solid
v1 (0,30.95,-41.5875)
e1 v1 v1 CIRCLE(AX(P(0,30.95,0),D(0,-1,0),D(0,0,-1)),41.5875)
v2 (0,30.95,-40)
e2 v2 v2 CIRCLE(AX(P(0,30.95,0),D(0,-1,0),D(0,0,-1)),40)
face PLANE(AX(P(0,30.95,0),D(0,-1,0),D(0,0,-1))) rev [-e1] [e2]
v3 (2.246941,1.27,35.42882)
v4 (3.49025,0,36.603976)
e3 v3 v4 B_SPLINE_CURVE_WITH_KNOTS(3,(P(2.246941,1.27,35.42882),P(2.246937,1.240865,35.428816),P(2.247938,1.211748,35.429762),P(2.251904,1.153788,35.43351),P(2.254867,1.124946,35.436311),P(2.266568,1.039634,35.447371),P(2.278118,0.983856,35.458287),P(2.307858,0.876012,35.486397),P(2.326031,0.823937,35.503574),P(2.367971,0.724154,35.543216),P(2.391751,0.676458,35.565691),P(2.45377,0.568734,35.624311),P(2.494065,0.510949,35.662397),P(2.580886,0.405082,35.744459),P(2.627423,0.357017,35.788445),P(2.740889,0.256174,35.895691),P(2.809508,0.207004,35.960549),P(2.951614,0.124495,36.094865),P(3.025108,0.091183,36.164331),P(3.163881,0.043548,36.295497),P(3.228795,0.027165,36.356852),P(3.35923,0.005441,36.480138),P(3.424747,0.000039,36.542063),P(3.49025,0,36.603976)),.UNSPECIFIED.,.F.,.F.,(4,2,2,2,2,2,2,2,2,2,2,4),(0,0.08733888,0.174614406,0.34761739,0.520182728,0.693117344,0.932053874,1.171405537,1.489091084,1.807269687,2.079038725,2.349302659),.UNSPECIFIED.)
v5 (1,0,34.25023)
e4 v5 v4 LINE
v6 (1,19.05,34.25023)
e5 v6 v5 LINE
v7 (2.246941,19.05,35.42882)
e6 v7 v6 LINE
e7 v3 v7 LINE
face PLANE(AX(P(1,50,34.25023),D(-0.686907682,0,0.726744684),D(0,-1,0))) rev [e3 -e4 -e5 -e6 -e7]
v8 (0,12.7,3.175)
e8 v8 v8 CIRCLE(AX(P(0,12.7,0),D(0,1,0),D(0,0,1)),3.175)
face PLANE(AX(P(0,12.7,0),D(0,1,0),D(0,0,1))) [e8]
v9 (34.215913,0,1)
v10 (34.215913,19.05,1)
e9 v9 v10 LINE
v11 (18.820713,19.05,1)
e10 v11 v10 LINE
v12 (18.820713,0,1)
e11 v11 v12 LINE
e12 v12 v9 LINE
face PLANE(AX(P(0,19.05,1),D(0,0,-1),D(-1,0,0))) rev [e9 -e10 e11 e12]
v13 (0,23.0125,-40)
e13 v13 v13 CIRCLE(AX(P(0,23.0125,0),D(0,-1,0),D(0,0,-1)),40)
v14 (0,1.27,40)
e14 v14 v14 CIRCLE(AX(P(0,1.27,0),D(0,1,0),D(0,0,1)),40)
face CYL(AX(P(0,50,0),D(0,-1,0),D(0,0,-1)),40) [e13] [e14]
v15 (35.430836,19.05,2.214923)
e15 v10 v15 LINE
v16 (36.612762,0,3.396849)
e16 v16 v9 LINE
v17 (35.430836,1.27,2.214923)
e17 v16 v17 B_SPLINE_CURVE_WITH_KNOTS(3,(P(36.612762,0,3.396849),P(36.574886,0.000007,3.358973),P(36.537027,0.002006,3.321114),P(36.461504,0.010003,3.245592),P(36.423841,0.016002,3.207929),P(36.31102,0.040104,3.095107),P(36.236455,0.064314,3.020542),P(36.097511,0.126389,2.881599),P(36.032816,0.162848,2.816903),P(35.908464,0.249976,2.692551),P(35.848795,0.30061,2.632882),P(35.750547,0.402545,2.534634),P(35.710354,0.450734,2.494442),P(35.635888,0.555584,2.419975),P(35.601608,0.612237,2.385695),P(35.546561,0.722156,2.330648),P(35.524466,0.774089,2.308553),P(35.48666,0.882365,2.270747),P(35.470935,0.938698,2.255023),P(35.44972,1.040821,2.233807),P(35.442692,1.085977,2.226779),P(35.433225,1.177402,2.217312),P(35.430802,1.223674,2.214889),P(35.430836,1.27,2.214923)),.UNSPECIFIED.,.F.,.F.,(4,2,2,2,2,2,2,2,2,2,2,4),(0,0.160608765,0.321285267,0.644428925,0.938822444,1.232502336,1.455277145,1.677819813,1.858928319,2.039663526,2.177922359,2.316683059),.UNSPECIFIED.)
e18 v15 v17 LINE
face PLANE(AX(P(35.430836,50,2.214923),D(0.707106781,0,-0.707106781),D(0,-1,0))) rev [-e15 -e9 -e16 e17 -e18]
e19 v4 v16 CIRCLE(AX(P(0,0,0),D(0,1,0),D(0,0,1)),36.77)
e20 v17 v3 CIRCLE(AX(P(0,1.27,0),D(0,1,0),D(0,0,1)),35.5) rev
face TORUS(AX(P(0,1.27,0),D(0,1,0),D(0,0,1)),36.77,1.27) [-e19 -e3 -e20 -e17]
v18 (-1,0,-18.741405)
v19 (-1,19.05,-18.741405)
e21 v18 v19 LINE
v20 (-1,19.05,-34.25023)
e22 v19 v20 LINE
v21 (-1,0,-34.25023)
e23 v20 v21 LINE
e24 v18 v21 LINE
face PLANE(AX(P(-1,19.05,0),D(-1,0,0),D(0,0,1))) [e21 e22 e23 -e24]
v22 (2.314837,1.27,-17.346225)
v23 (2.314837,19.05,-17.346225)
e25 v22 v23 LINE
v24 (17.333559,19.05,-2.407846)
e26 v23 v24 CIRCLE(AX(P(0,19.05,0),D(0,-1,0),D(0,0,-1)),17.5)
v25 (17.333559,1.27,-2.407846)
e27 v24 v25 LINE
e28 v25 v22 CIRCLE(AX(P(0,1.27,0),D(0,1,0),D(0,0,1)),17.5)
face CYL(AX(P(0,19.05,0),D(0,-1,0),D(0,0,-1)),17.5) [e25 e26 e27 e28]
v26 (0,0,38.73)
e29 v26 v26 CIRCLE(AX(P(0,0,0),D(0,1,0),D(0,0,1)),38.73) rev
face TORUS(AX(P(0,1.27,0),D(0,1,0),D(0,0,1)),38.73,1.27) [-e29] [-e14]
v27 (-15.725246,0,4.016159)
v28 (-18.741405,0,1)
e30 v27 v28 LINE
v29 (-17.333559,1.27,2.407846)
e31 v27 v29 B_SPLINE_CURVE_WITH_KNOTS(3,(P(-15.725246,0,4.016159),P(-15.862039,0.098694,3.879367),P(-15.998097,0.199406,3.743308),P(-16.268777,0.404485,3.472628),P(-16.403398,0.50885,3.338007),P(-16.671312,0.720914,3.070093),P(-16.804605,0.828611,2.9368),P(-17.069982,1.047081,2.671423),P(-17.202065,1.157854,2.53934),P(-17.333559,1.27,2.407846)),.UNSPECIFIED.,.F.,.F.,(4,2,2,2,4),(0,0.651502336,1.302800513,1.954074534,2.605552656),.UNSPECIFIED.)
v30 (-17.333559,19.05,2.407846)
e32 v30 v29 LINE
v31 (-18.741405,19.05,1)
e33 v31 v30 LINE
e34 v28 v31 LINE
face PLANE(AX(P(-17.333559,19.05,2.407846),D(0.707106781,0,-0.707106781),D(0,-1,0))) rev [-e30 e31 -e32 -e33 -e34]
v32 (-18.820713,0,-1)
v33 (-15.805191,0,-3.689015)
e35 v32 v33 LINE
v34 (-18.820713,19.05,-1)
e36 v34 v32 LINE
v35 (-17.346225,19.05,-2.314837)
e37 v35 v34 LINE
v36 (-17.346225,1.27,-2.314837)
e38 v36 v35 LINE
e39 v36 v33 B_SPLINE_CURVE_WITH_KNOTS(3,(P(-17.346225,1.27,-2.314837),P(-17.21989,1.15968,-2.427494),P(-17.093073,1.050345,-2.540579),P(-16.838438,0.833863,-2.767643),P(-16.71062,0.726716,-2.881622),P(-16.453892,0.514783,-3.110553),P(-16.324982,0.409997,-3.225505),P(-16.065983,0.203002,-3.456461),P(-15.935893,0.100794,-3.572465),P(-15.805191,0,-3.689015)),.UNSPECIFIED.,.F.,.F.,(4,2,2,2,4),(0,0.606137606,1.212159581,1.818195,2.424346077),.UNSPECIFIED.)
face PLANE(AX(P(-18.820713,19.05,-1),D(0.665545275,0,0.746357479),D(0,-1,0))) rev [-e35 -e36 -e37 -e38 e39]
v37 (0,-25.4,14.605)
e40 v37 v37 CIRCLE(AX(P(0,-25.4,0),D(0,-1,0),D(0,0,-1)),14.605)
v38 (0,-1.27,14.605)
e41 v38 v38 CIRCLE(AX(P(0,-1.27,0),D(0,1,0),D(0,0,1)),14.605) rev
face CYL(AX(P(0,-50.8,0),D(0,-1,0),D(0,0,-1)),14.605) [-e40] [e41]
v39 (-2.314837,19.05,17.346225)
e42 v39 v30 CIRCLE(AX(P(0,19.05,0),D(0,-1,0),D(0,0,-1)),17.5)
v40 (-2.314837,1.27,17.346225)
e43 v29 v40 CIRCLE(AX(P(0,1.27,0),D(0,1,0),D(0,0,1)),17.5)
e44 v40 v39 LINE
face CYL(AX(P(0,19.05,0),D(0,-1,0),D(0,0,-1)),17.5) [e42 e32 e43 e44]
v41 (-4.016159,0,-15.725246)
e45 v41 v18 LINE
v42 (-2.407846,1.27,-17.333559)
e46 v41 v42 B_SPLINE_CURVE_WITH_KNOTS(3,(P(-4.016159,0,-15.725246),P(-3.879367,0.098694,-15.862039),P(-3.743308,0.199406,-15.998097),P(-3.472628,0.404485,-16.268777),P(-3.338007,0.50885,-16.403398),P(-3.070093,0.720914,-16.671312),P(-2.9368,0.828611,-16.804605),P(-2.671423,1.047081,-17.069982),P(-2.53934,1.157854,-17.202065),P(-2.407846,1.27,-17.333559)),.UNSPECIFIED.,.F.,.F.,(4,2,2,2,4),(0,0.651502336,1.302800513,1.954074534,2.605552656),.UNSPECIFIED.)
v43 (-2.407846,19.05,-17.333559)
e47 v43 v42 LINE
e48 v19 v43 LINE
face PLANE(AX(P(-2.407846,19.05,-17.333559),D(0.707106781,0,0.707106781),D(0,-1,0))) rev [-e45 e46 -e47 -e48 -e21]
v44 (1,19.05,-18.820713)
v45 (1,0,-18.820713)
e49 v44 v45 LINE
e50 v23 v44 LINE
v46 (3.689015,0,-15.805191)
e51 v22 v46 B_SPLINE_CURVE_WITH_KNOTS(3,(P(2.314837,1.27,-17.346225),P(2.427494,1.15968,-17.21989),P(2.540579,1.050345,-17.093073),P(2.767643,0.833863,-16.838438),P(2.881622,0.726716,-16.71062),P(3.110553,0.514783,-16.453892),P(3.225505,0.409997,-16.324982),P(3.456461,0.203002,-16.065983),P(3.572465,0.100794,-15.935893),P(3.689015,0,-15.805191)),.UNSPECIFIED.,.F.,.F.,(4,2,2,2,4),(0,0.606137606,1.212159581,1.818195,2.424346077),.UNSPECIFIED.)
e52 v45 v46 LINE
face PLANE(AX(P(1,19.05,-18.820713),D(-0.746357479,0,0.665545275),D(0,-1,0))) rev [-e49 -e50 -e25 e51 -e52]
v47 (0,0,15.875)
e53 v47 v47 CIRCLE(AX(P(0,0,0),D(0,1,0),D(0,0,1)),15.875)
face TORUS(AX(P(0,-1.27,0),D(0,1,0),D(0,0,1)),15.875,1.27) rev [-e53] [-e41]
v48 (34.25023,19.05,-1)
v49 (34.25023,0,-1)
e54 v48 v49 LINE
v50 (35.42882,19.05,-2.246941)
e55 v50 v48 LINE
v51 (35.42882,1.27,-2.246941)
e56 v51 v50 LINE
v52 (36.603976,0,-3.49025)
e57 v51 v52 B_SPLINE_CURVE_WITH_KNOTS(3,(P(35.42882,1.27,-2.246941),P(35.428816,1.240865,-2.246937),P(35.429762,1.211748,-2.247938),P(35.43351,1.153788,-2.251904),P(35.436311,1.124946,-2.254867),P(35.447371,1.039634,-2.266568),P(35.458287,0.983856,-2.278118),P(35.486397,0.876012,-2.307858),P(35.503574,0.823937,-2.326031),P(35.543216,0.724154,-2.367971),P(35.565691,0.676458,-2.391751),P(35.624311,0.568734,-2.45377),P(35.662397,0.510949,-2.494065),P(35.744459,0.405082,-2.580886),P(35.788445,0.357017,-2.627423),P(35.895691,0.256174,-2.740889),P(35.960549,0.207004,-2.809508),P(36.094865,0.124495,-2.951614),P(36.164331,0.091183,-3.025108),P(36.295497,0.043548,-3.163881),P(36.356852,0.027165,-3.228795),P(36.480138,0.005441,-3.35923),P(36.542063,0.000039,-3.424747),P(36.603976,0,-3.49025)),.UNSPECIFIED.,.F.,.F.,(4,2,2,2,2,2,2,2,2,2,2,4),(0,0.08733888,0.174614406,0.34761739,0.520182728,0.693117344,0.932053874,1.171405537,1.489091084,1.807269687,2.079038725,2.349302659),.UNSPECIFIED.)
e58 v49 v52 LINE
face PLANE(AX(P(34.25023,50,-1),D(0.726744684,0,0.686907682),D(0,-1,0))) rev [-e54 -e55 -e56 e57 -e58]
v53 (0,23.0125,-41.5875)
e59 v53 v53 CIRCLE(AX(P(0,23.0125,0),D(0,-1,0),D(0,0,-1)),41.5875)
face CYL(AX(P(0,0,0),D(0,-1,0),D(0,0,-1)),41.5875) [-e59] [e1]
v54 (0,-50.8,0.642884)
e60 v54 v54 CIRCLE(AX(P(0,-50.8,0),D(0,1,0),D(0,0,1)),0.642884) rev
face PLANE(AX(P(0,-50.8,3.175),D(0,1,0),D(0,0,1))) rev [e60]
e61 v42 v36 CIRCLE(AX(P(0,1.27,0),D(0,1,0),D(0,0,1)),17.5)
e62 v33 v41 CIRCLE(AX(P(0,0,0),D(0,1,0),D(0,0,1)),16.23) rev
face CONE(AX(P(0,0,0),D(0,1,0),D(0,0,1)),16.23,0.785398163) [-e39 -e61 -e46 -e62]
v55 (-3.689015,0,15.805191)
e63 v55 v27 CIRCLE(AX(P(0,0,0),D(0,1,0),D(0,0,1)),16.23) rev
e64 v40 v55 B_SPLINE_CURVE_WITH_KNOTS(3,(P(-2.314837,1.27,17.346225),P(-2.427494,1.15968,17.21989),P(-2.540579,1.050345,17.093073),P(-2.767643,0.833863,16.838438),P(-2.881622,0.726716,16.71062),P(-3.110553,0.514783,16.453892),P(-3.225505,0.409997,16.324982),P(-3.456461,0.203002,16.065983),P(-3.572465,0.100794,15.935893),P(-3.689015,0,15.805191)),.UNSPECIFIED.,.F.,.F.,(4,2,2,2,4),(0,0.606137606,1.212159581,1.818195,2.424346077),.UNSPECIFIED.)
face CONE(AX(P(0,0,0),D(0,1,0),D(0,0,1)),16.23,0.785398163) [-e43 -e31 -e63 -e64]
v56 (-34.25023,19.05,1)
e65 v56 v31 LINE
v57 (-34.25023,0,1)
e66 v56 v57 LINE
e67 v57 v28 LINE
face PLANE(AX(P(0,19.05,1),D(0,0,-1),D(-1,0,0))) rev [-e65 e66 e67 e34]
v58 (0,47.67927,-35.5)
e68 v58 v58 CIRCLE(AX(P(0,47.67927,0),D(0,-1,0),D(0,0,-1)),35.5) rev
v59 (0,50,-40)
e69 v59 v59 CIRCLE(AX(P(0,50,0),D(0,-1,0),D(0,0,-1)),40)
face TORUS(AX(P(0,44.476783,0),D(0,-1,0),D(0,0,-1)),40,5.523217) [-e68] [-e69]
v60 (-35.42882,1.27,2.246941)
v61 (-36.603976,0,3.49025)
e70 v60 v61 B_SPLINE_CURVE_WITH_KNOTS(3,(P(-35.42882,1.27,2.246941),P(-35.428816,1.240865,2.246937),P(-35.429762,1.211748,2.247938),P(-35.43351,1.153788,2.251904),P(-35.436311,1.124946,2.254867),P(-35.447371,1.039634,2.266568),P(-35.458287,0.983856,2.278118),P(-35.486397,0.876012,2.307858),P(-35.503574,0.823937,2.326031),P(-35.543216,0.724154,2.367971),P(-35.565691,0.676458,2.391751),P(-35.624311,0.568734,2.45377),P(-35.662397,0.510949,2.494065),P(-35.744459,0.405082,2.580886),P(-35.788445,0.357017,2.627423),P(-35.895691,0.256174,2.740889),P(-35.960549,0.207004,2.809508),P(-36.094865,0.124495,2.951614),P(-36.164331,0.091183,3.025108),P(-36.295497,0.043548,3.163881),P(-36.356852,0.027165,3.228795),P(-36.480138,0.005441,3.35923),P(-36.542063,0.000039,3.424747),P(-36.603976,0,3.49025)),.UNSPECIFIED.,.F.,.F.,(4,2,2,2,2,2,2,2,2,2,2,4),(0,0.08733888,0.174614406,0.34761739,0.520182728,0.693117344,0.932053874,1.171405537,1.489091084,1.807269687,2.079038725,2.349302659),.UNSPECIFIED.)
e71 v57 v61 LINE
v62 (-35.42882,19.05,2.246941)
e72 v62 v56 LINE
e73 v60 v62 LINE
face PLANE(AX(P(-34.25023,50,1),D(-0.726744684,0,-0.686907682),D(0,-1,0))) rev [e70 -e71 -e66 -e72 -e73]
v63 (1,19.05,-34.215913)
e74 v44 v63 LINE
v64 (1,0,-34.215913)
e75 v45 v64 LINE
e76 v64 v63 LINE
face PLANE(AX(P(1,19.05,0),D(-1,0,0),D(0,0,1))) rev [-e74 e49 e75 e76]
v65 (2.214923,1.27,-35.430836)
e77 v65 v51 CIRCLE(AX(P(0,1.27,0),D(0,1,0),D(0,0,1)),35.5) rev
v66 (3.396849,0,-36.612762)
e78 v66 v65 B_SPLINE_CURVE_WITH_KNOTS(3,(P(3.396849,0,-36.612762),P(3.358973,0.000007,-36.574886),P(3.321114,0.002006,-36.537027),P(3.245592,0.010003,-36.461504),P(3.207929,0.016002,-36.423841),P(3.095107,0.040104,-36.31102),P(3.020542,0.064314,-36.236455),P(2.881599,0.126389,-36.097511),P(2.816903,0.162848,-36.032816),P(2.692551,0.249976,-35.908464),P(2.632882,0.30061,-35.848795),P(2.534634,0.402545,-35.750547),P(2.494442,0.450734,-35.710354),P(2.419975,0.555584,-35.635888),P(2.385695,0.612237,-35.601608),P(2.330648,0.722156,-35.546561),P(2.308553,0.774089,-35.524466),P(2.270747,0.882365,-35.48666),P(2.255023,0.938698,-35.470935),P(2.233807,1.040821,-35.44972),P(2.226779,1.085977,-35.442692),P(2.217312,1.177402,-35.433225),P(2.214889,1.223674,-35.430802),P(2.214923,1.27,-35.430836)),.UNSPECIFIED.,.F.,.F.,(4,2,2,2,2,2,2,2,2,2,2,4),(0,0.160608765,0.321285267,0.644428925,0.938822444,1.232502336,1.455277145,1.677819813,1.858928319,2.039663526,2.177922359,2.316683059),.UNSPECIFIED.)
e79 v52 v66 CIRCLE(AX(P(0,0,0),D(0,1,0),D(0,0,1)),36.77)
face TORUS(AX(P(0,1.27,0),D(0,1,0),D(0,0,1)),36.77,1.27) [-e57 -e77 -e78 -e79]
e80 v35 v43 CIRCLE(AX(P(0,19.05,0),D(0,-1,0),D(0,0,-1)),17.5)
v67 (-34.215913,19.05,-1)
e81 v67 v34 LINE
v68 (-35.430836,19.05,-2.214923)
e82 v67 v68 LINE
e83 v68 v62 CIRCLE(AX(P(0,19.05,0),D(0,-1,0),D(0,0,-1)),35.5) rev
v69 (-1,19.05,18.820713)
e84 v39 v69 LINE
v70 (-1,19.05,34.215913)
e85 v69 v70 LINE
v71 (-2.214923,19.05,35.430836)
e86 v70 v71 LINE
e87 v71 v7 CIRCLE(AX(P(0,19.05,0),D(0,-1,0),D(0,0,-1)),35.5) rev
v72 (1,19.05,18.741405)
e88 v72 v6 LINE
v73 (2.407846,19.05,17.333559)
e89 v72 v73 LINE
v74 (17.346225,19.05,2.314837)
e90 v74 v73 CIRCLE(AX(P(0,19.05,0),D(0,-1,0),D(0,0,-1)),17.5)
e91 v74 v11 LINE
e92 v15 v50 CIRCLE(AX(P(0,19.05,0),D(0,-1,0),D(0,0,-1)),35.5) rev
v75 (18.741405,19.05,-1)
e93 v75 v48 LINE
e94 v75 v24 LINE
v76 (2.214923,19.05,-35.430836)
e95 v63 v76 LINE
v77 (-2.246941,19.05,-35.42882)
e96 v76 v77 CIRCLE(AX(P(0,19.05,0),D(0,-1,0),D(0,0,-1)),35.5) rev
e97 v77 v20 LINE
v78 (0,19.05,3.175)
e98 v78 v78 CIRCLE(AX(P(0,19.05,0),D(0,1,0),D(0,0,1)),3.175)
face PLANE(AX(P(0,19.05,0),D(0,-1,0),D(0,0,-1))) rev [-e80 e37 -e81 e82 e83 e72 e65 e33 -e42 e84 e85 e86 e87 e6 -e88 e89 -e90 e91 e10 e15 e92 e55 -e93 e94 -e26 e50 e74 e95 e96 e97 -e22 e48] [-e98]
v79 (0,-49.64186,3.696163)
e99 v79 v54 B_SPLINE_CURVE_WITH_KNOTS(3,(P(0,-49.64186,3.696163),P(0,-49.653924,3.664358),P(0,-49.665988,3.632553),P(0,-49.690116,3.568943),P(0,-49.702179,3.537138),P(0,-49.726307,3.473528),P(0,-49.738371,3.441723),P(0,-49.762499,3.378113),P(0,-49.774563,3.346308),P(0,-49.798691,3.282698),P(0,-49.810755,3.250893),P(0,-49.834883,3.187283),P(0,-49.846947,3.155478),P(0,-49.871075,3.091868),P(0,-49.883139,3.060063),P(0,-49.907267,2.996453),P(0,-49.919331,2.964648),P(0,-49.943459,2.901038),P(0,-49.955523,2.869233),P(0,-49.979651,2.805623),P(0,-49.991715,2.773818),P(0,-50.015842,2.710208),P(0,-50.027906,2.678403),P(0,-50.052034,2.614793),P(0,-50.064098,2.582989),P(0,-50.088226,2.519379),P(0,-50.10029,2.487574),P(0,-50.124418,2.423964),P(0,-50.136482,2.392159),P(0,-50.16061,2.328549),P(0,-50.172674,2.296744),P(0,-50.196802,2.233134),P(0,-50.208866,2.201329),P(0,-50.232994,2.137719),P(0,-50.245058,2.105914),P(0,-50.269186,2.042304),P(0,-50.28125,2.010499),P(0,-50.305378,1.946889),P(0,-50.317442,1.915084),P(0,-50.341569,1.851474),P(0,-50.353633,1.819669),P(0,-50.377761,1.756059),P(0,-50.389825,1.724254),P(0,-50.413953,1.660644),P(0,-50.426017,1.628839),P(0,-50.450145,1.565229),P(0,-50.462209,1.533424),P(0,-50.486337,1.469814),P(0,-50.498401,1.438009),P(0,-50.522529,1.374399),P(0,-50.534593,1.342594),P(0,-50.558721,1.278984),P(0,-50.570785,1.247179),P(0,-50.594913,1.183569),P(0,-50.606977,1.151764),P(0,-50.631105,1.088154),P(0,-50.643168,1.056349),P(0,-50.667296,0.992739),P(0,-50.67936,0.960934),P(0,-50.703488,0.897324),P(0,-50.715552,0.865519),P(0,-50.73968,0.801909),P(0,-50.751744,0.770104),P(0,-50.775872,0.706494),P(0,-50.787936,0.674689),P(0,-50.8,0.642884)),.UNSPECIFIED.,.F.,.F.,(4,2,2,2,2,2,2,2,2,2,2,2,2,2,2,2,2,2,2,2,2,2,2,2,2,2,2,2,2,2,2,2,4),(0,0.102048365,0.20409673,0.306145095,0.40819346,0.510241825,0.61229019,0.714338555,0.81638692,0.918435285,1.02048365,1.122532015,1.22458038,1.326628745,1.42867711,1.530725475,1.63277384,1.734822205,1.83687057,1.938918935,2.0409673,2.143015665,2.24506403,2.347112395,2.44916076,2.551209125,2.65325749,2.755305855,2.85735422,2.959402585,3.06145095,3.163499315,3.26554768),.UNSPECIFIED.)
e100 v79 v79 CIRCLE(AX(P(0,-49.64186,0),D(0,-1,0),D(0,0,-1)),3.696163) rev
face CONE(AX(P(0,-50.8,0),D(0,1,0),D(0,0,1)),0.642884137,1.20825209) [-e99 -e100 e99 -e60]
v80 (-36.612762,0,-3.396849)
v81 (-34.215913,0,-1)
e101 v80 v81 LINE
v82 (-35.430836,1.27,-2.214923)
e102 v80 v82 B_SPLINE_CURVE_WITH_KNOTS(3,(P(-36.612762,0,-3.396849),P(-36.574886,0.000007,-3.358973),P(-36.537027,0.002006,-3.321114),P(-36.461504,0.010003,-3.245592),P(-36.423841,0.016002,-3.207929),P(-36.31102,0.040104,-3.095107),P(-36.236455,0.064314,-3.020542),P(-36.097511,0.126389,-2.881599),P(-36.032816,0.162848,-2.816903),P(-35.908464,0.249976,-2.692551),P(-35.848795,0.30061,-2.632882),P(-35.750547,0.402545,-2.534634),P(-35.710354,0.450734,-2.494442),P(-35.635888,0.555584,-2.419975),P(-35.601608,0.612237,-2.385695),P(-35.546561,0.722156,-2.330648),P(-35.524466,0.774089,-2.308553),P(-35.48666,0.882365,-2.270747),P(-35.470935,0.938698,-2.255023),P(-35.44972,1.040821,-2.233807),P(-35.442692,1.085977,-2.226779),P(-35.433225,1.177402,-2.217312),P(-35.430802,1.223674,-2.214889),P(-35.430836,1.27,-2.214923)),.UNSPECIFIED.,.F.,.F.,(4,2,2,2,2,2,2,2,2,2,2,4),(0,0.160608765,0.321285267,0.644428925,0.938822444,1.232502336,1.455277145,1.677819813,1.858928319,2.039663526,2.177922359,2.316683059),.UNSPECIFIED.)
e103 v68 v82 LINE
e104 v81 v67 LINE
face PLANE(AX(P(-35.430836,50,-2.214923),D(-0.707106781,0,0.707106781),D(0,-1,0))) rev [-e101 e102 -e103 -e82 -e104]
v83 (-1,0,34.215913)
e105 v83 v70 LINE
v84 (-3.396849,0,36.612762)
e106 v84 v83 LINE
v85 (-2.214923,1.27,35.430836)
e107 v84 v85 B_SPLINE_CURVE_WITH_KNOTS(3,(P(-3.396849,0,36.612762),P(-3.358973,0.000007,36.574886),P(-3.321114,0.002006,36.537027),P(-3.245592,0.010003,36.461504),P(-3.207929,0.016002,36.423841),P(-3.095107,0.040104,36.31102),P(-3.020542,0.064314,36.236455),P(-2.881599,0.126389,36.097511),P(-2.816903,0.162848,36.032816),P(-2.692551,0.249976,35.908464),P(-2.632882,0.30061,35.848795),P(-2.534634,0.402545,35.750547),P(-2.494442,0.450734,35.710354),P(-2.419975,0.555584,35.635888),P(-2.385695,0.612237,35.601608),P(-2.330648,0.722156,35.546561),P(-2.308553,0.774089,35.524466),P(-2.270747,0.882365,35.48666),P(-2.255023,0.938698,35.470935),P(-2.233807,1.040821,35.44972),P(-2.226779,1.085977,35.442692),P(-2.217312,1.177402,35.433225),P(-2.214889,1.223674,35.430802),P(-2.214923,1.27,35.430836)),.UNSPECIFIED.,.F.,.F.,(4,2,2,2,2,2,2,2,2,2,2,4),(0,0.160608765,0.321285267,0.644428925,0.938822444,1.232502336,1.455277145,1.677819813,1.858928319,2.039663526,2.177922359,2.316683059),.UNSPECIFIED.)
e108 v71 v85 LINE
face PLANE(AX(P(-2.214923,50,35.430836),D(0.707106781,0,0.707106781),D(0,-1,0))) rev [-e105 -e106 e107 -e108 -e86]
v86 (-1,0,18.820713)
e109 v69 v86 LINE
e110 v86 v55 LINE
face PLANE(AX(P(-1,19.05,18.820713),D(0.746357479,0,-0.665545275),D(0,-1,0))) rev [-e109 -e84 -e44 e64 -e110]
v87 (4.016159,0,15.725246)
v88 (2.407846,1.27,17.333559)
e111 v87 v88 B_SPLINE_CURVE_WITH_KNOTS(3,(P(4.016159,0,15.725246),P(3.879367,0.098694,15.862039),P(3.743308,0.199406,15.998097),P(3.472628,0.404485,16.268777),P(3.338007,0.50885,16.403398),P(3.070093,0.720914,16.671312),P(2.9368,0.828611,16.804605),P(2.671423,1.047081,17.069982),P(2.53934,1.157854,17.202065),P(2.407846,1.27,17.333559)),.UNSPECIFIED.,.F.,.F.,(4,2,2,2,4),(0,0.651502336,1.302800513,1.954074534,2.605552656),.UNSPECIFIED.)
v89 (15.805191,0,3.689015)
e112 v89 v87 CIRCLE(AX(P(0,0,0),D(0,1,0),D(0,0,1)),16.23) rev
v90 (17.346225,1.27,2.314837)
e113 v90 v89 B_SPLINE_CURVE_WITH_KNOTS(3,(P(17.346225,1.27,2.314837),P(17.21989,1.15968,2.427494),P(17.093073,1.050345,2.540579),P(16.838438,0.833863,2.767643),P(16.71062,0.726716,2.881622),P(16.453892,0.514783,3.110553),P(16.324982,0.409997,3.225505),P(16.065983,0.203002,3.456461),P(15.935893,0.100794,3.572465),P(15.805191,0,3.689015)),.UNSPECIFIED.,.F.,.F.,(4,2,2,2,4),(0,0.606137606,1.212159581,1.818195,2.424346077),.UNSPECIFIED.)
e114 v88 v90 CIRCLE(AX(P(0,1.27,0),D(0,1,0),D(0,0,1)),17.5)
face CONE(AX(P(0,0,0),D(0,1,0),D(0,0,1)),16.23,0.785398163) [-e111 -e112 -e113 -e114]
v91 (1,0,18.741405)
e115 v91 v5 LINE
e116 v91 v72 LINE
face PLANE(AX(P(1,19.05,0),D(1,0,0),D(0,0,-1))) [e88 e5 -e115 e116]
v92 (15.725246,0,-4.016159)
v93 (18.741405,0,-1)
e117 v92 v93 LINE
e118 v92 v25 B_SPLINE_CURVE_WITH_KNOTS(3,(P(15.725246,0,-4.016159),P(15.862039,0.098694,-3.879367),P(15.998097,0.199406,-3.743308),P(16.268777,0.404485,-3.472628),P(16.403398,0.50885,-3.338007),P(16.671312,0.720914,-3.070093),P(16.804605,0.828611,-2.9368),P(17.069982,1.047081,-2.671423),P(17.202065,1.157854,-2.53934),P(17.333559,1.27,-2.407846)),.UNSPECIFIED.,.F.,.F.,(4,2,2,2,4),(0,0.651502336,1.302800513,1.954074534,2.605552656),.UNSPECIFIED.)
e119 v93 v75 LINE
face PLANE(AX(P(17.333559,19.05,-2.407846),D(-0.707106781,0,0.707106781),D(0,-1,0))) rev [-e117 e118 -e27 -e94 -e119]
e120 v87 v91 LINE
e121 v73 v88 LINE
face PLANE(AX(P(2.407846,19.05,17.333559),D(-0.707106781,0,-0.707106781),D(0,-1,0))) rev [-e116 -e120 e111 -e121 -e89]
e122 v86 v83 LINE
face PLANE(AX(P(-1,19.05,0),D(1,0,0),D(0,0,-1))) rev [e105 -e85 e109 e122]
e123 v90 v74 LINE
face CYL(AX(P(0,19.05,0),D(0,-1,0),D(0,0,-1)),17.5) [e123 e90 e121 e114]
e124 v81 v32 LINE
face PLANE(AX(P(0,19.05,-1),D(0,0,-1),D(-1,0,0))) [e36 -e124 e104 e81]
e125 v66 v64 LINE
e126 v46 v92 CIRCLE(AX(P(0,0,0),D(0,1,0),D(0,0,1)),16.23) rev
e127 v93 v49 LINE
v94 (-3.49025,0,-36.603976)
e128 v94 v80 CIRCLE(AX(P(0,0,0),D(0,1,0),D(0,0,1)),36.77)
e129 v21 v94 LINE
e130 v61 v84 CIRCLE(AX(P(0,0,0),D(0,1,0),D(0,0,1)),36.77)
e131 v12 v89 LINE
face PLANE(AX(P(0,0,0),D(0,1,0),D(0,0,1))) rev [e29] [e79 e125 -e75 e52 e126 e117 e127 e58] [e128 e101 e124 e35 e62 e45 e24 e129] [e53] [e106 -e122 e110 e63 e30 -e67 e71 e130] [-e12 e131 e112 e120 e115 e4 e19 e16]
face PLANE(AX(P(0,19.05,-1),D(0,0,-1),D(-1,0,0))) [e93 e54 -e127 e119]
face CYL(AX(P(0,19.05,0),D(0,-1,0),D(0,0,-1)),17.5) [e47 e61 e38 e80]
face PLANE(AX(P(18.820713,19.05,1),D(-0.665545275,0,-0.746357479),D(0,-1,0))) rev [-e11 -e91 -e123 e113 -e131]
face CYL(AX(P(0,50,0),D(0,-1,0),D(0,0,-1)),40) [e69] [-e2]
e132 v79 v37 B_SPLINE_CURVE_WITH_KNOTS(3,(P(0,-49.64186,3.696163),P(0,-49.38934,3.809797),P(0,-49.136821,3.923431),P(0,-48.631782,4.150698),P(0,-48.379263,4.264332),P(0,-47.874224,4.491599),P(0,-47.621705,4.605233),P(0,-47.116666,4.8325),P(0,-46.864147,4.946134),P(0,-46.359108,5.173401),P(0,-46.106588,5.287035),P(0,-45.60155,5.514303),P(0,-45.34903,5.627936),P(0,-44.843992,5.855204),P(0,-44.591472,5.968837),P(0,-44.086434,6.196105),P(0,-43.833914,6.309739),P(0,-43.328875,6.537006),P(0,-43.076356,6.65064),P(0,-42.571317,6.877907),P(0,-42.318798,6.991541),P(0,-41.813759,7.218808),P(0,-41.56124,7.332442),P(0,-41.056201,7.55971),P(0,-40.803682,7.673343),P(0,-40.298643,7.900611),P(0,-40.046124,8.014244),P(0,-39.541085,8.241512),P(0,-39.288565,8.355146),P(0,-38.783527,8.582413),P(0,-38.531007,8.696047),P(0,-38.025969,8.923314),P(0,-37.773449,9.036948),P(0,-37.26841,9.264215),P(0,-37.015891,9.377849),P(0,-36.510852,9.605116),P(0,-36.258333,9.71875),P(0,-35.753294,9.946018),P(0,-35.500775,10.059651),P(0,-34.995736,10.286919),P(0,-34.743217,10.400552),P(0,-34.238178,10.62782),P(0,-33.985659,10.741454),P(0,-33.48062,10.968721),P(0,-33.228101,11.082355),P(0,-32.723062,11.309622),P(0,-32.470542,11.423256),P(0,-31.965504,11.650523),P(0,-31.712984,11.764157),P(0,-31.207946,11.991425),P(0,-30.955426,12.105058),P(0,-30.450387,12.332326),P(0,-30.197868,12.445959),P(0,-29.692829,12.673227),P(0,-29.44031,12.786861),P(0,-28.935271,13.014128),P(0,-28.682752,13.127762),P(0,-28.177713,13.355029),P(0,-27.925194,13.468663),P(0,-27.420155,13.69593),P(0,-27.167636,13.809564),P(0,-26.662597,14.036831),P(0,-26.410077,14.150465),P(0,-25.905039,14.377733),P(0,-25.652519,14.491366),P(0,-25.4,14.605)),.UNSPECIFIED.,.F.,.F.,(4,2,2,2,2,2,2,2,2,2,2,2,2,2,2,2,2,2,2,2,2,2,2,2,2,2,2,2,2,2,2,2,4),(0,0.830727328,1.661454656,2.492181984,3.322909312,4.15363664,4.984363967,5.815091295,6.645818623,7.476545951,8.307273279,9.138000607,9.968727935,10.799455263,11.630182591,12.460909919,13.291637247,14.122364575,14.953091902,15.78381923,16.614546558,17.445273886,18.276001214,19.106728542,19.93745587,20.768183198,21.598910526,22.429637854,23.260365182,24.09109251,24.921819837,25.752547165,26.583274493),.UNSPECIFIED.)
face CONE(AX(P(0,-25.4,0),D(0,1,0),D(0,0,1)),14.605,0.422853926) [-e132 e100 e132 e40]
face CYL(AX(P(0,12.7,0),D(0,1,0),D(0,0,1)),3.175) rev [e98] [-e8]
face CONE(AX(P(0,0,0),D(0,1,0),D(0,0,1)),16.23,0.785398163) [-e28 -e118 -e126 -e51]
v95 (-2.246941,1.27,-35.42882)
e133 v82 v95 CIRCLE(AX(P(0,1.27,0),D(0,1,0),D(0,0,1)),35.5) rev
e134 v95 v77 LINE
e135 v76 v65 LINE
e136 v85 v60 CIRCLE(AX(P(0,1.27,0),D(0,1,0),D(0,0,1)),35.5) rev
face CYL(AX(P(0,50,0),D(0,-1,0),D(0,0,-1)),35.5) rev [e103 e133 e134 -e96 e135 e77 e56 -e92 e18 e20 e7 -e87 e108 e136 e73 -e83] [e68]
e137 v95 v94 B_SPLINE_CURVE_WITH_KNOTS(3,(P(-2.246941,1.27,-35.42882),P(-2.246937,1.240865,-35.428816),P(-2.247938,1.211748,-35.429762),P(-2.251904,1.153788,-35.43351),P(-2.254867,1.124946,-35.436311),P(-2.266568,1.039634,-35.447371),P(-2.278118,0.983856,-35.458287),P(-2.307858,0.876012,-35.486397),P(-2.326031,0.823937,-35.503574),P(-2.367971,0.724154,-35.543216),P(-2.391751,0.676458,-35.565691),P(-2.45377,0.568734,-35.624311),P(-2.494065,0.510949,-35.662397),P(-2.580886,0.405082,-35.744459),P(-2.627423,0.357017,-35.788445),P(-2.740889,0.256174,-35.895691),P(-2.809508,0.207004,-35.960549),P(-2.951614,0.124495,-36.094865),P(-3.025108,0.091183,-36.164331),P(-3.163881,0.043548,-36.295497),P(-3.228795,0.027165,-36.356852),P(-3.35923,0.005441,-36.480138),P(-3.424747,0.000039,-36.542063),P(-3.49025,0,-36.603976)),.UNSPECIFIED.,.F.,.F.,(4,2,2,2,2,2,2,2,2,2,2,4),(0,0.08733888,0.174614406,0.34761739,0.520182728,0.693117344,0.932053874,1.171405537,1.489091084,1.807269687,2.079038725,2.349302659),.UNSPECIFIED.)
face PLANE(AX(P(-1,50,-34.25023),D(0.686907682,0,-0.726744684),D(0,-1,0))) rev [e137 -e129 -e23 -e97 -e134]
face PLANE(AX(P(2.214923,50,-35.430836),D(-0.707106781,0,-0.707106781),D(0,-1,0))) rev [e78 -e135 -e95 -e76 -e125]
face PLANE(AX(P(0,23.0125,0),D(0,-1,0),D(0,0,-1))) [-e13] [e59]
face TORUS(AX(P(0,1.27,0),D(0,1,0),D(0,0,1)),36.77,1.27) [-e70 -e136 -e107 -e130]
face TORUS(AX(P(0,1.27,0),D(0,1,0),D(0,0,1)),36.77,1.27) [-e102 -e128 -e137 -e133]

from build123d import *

# Parameters (mm, degrees)
SKETCH1_R           = 40
SKETCH1_R_2         = 35.5
BOSS_EXTRUDE1_DEPTH = 50
BOSS_EXTRUDE2_DEPTH = 19.05
SKETCH4_R           = 3.175
CUT_EXTRUDE1_DEPTH  = 6.35
CHAMFER1_SIZE       = 1.27
CHAMFER1_SIZE2      = 2.532115863
CHAMFER2_SIZE       = 1.27
CHAMFER2_SIZE_2     = 1.349308072
CHAMFER2_SIZE_3     = 1.235682395
CHAMFER3_SIZE       = 1.27
FILLET1_R           = 1.27
SKETCH9_W           = 1.5875
SKETCH9_H           = 7.9375


with BuildPart() as part:
    # Sketch1 → Boss-Extrude1 (new body)
    with BuildSketch(Plane(origin=(0, 0, 0), x_dir=(1, 0, 0), z_dir=(0, 1, 0))):
        with Locations(Location((0, 0, 0), (0, 0, 270))):
            Circle(SKETCH1_R)
        with Locations(Location((0, 0, 0), (0, 0, 270))):
            Circle(SKETCH1_R_2, mode=Mode.SUBTRACT)
    extrude(amount=BOSS_EXTRUDE1_DEPTH)

    # Sketch3 → Boss-Extrude2 (add)
    with BuildSketch(Plane.XZ):
        with BuildLine():
            Line((17.47140521, -1), (1, -1))
            Line((1, -1), (1, -17.47140521))
            ThreePointArc((1, -17.47140521), (12.374368671, -12.374368671), (17.47140521, -1))
        make_face()
        with BuildLine():
            Line((1, 17.47140521), (1, 1))
            Line((1, 1), (17.47140521, 1))
            ThreePointArc((17.47140521, 1), (12.374368671, 12.374368671), (1, 17.47140521))
        make_face()
        with BuildLine():
            Line((-17.47140521, 1), (-1, 1))
            Line((-1, 1), (-1, 17.47140521))
            ThreePointArc((-1, 17.47140521), (-12.374368671, 12.374368671), (-17.47140521, 1))
        make_face()
        with BuildLine():
            Line((-1, -17.47140521), (-1, -1))
            Line((-1, -1), (-17.47140521, -1))
            ThreePointArc((-17.47140521, -1), (-12.374368671, -12.374368671), (-1, -17.47140521))
        make_face()
        with BuildLine():
            ThreePointArc((0, -1), (0.707106781, -0.707106781), (1, 0))
            ThreePointArc((1, 0), (0.707106781, 0.707106781), (0, 1))
            ThreePointArc((0, 1), (-0.707106781, 0.707106781), (-1, 0))
            ThreePointArc((-1, 0), (-0.707106781, -0.707106781), (0, -1))
        make_face()
        with BuildLine():
            Line((-1, -1), (0, -1))
            ThreePointArc((0, -1), (-0.707106781, -0.707106781), (-1, 0))
            Line((-1, 0), (-1, -1))
        make_face()
        with BuildLine():
            Line((1, -1), (1, 0))
            ThreePointArc((1, 0), (0.707106781, -0.707106781), (0, -1))
            Line((0, -1), (1, -1))
        make_face()
        with BuildLine():
            ThreePointArc((0, 1), (0.707106781, 0.707106781), (1, 0))
            Line((1, 0), (1, 1))
            Line((1, 1), (0, 1))
        make_face()
        with BuildLine():
            ThreePointArc((-1, 0), (-0.707106781, 0.707106781), (0, 1))
            Line((0, 1), (-1, 1))
            Line((-1, 1), (-1, 0))
        make_face()
        with BuildLine():
            Line((-17.47140521, -1), (-1, -1))
            Line((-1, -1), (-1, 0))
            Line((-1, 0), (-1, 1))
            Line((-1, 1), (-17.47140521, 1))
            ThreePointArc((-17.47140521, 1), (-17.5, 0), (-17.47140521, -1))
        make_face()
        with BuildLine():
            Line((1, 1), (1, 0))
            Line((1, 0), (1, -1))
            Line((1, -1), (17.47140521, -1))
            ThreePointArc((17.47140521, -1), (17.492849842, -0.500204374), (17.5, 0))
            ThreePointArc((17.5, 0), (17.492849842, 0.500204374), (17.47140521, 1))
            Line((17.47140521, 1), (1, 1))
        make_face()
        with BuildLine():
            Line((0, 1), (1, 1))
            Line((1, 1), (1, 17.47140521))
            ThreePointArc((1, 17.47140521), (0, 17.5), (-1, 17.47140521))
            Line((-1, 17.47140521), (-1, 1))
            Line((-1, 1), (0, 1))
        make_face()
        with BuildLine():
            Line((1, -17.47140521), (1, -1))
            Line((1, -1), (0, -1))
            Line((0, -1), (-1, -1))
            Line((-1, -1), (-1, -17.47140521))
            ThreePointArc((-1, -17.47140521), (0, -17.5), (1, -17.47140521))
        make_face()
        with BuildLine():
            ThreePointArc((-1, 17.47140521), (0, 17.5), (1, 17.47140521))
            Line((1, 17.47140521), (1, 35.485912698))
            ThreePointArc((1, 35.485912698), (0, 35.5), (-1, 35.485912698))
            Line((-1, 35.485912698), (-1, 17.47140521))
        make_face()
        with BuildLine():
            Line((-35.485912698, -1), (-17.47140521, -1))
            ThreePointArc((-17.47140521, -1), (-17.5, 0), (-17.47140521, 1))
            Line((-17.47140521, 1), (-35.485912698, 1))
            ThreePointArc((-35.485912698, 1), (-35.5, 0), (-35.485912698, -1))
        make_face()
        with BuildLine():
            Line((35.485912698, 1), (17.47140521, 1))
            ThreePointArc((17.47140521, 1), (17.492849842, 0.500204374), (17.5, 0))
            ThreePointArc((17.5, 0), (17.492849842, -0.500204374), (17.47140521, -1))
            Line((17.47140521, -1), (35.485912698, -1))
            ThreePointArc((35.485912698, -1), (35.496478, -0.500049611), (35.5, 0))
            ThreePointArc((35.5, 0), (35.496478, 0.500049611), (35.485912698, 1))
        make_face()
        with BuildLine():
            Line((1, -35.485912698), (1, -17.47140521))
            ThreePointArc((1, -17.47140521), (0, -17.5), (-1, -17.47140521))
            Line((-1, -17.47140521), (-1, -35.485912698))
            ThreePointArc((-1, -35.485912698), (0, -35.5), (1, -35.485912698))
        make_face()
    extrude(amount=-BOSS_EXTRUDE2_DEPTH)

    # Sketch4 → Cut-Extrude1 (cut)
    with BuildSketch(Plane(origin=(0, 19.05, 0), x_dir=(1, 0, 0), z_dir=(0, 1, 0))):
        with Locations(Location((0, 0, 0), (0, 0, 270))):
            Circle(SKETCH4_R)
    extrude(amount=-CUT_EXTRUDE1_DEPTH, mode=Mode.SUBTRACT)

    # Sketch6 → Cut-Revolve1 (revolve, cut)
    with BuildSketch(Plane(origin=(0, 0, 0), x_dir=(0, 0, -1), z_dir=(1, 0, 0)), mode=Mode.PRIVATE) as cut_revolve1_sk:
        with BuildLine():
            Line((-34.613579945, 45.698422217), (0, 45.698422217))
            Line((0, 45.698422217), (0, 50))
            Line((0, 50), (-40, 50))
            ThreePointArc((-40, 50), (-36.55336786, 48.792643537), (-34.613579945, 45.698422217))
        make_face()
    revolve(cut_revolve1_sk.sketch.rotate(Axis((0, 0, 0), (0, 1, 0)), 180), axis=Axis((0, 0, 0), (0, 1, 0)), mode=Mode.SUBTRACT)

    # Sketch8 → Revolve1 (revolve)
    with BuildSketch(Plane(origin=(0, 0, 0), x_dir=(0, 0, -1), z_dir=(1, 0, 0))):
        Polygon((0, 0), (-14.605, 0), (-14.605, -25.4), (-3.175, -50.8), (0, -50.8), align=None)
    revolve(axis=Axis((0, -50.8, 0), (0, 1, 0)))

    # Chamfer1
    chamfer1_edges = [part.edges().sort_by_distance(p)[0] for p in [
        (0, -50.8, -3.175),
    ]]
    chamfer1_side = [part.faces().sort_by_distance(p)[0] for p in [
        (0, -38.1, -8.89),
    ]]
    chamfer(chamfer1_edges, length=CHAMFER1_SIZE, length2=CHAMFER1_SIZE2, reference=chamfer1_side[0])

    # Chamfer2
    # the kernel refuses this chamfer: 1.349308072, 1.27, 1.235682395 mm, written as the material it adds along each edge
    with BuildSketch(Plane(origin=(1, 0, 17.47140521), x_dir=(0, 0, 1), z_dir=(0, 1, 0)), Plane(origin=(17.47140521, 0, -1), x_dir=(1, 0, 0), z_dir=(0, 1, 0)), Plane(origin=(-1, 0, -17.47140521), x_dir=(0, 0, -1), z_dir=(0, 1, 0)), Plane(origin=(-17.47140521, 0, 1), x_dir=(-1, 0, 0), z_dir=(0, 1, 0))) as chamfer2_piece_1:
        with BuildLine():
            Line((CHAMFER2_SIZE, 0), (-0.137845907, 1.407845907))
            ThreePointArc((-0.137845907, 1.407845907), (-0.05673998, 0.726103978), (0, 0))
            Line((0, 0), (CHAMFER2_SIZE, 0))
        make_face()
    extrude(amount=19.05)
    with BuildSketch(Plane(origin=(17.47140521, 0, 1), x_dir=(1, 0, 0), z_dir=(0, 1, 0)), Plane(origin=(1, 0, -17.47140521), x_dir=(0, 0, -1), z_dir=(0, 1, 0)), Plane(origin=(-17.47140521, 0, -1), x_dir=(-1, 0, 0), z_dir=(0, 1, 0)), Plane(origin=(-1, 0, 17.47140521), x_dir=(0, 0, 1), z_dir=(0, 1, 0))) as chamfer2_piece_2:
        with BuildLine():
            Line((CHAMFER2_SIZE_2, 0), (-0.125180008, -1.314837196))
            ThreePointArc((-0.125180008, -1.314837196), (-0.052071189, -0.67833318), (0, 0))
            Line((0, 0), (CHAMFER2_SIZE_2, 0))
        make_face()
    extrude(amount=19.05)
    with BuildSketch(Plane(origin=(35.485912698, 0, 1), x_dir=(-0.04528724954779088, 0, 0.9989740061825413), z_dir=(0, 1, 0)), Plane(origin=(1, 0, -35.485912698), x_dir=(0.9989740061825413, 0, 0.045287249547790925), z_dir=(0, 1, 0)), Plane(origin=(-35.485912698, 0, -1), x_dir=(0.04528724954779079, 0, -0.9989740061825413), z_dir=(0, 1, 0)), Plane(origin=(-1, 0, 35.485912698), x_dir=(-0.998974006182541, 0, -0.04528724954779687), z_dir=(0, 1, 0))) as chamfer2_piece_3:
        with BuildLine():
            Line((1.216170755, 0), (CHAMFER2_SIZE * 0.0452872495476, -CHAMFER2_SIZE * 0.998974006183))
            Line((CHAMFER2_SIZE * 0.0452872495476, -CHAMFER2_SIZE * 0.998974006183), (0, 0))
            ThreePointArc((0, 0), (0.625207544, 0.00520425), (1.216170755, 0))
        make_face()
    extrude(amount=19.05)
    with BuildSketch(Plane(origin=(35.485912698, 0, -1), x_dir=(-0.04573863515170876, 0, -0.9989534409843429), z_dir=(0, 1, 0)), Plane(origin=(-1, 0, -35.485912698), x_dir=(-0.9989534409843427, 0, 0.045738635151709006), z_dir=(0, 1, 0)), Plane(origin=(-35.485912698, 0, 1), x_dir=(0.04573863515170318, 0, 0.998953440984343), z_dir=(0, 1, 0)), Plane(origin=(1, 0, 35.485912698), x_dir=(0.998953440984343, 0, -0.045738635151703046), z_dir=(0, 1, 0))) as chamfer2_piece_4:
        with BuildLine():
            Line((1.248247546, 0), (CHAMFER2_SIZE_3 * 0.0457386351654, CHAMFER2_SIZE_3 * 0.998953441289))
            Line((CHAMFER2_SIZE_3 * 0.0457386351654, CHAMFER2_SIZE_3 * 0.998953441289), (0, 0))
            ThreePointArc((0, 0), (0.641759392, -0.005482388), (1.248247546, 0))
        make_face()
    extrude(amount=19.05)

    # Chamfer3
    chamfer3_edges = [part.edges().sort_by_distance(p)[0] for p in [
        (12.341137112, 0, -12.407511224),
        (-12.407511224, 0, -12.341137112),
        (-12.341137112, 0, 12.407511224),
        (12.407511224, 0, 12.341137112),
    ]]
    chamfer(chamfer3_edges, length=CHAMFER3_SIZE)

    # Fillet1
    # the kernel refuses this fillet: 1.27 mm, written as the material it adds along each edge
    with BuildSketch(Plane(origin=(0, 0, 0), x_dir=(0, 0, 1), z_dir=(-1, 0, 0))) as fillet1_piece_1:
        with BuildLine():
            CenterArc((14.605 + FILLET1_R, -FILLET1_R), FILLET1_R, 90, 90)
            Line((14.605, -FILLET1_R), (14.605, 0))
            Line((14.605, 0), (14.605 + FILLET1_R, 0))
        make_face()
    revolve(axis=Axis((0, 0, 0), (0, 1, 0)))
    # the kernel refuses this fillet: 1.27 mm, written as the material it takes off along each edge
    with BuildSketch(Plane(origin=(0, 0, 0), x_dir=(0, 0, 1), z_dir=(-1, 0, 0))) as fillet1_2_piece_1:
        with BuildLine():
            CenterArc((40 - FILLET1_R, FILLET1_R), FILLET1_R, 270, 90)
            Line((40, FILLET1_R), (40, 0))
            Line((40, 0), (40 - FILLET1_R, 0))
        make_face()
    revolve(axis=Axis((0, 0, 0), (0, 1, 0)), mode=Mode.SUBTRACT)
    with BuildSketch(Plane(origin=(0, 0, 0), x_dir=(-0.026127594293691846, 0, 0.9996586161367412), z_dir=(-0.9996586161367412, 0, -0.026127594293691846))) as fillet1_2_piece_2_section:
        with BuildLine():
            CenterArc((35.5 + FILLET1_R, FILLET1_R), FILLET1_R, 180, 90)
            Line((35.5, FILLET1_R), (35.5, 0))
            Line((35.5, 0), (35.5 + FILLET1_R, 0))
        make_face()
    fillet1_2_piece_2 = revolve(axis=Axis((0, 0, 0), (0, 1, 0)), revolution_arc=93.046121148, mode=Mode.PRIVATE)
    fillet1_2_piece_2 = split(fillet1_2_piece_2, bisect_by=Plane(origin=(-16.626095657, 0, 17.590321009), z_dir=(0.6869076823676358, 0, -0.7267446841252595)), keep=Keep.TOP, mode=Mode.PRIVATE)
    fillet1_2_piece_2 = split(fillet1_2_piece_2, bisect_by=Plane(origin=(16.607956349, 0, -16.607956349), z_dir=(-0.707106781186694, 0, 0.707106781186401)), keep=Keep.TOP, mode=Mode.PRIVATE)
    add(fillet1_2_piece_2, mode=Mode.SUBTRACT)
    with BuildSketch(Plane(origin=(0, 0, 0), x_dir=(-0.999658616136741, 0, -0.02612759429369253), z_dir=(0.02612759429369253, 0, -0.999658616136741))) as fillet1_2_piece_3_section:
        with BuildLine():
            CenterArc((35.5 + FILLET1_R, FILLET1_R), FILLET1_R, 180, 90)
            Line((35.5, FILLET1_R), (35.5, 0))
            Line((35.5, 0), (35.5 + FILLET1_R, 0))
        make_face()
    fillet1_2_piece_3 = revolve(axis=Axis((0, 0, 0), (0, 1, 0)), revolution_arc=93.046121148, mode=Mode.PRIVATE)
    fillet1_2_piece_3 = split(fillet1_2_piece_3, bisect_by=Plane(origin=(16.607956349, 0, 16.607956349), z_dir=(-0.7071067811864397, 0, -0.7071067811866554)), keep=Keep.TOP, mode=Mode.PRIVATE)
    fillet1_2_piece_3 = split(fillet1_2_piece_3, bisect_by=Plane(origin=(-17.590321009, 0, -16.626095657), z_dir=(0.7267446841252595, 0, 0.6869076823676358)), keep=Keep.TOP, mode=Mode.PRIVATE)
    add(fillet1_2_piece_3, mode=Mode.SUBTRACT)
    with BuildSketch(Plane(origin=(0, 0, 0), x_dir=(0.026127594293692467, 0, -0.999658616136741), z_dir=(0.999658616136741, 0, 0.026127594293692467))) as fillet1_2_piece_4_section:
        with BuildLine():
            CenterArc((35.5 + FILLET1_R, FILLET1_R), FILLET1_R, 180, 90)
            Line((35.5, FILLET1_R), (35.5, 0))
            Line((35.5, 0), (35.5 + FILLET1_R, 0))
        make_face()
    fillet1_2_piece_4 = revolve(axis=Axis((0, 0, 0), (0, 1, 0)), revolution_arc=93.046121148, mode=Mode.PRIVATE)
    fillet1_2_piece_4 = split(fillet1_2_piece_4, bisect_by=Plane(origin=(16.626095657, 0, -17.590321009), z_dir=(-0.6869076823676358, 0, 0.7267446841252595)), keep=Keep.TOP, mode=Mode.PRIVATE)
    fillet1_2_piece_4 = split(fillet1_2_piece_4, bisect_by=Plane(origin=(-16.607956349, 0, 16.607956349), z_dir=(0.707106781186694, 0, -0.707106781186401)), keep=Keep.TOP, mode=Mode.PRIVATE)
    add(fillet1_2_piece_4, mode=Mode.SUBTRACT)
    with BuildSketch(Plane(origin=(0, 0, 0), x_dir=(0.9996586161367412, 0, 0.026127594293692404), z_dir=(-0.026127594293692404, 0, 0.9996586161367412))) as fillet1_2_piece_5_section:
        with BuildLine():
            CenterArc((35.5 + FILLET1_R, FILLET1_R), FILLET1_R, 180, 90)
            Line((35.5, FILLET1_R), (35.5, 0))
            Line((35.5, 0), (35.5 + FILLET1_R, 0))
        make_face()
    fillet1_2_piece_5 = revolve(axis=Axis((0, 0, 0), (0, 1, 0)), revolution_arc=93.046121148, mode=Mode.PRIVATE)
    fillet1_2_piece_5 = split(fillet1_2_piece_5, bisect_by=Plane(origin=(-16.607956349, 0, -16.607956349), z_dir=(0.707106781186401, 0, 0.707106781186694)), keep=Keep.TOP, mode=Mode.PRIVATE)
    fillet1_2_piece_5 = split(fillet1_2_piece_5, bisect_by=Plane(origin=(17.590321009, 0, 16.626095657), z_dir=(-0.7267446841252595, 0, -0.6869076823676358)), keep=Keep.TOP, mode=Mode.PRIVATE)
    add(fillet1_2_piece_5, mode=Mode.SUBTRACT)

    # Sketch9 → Revolve2 (revolve)
    with BuildSketch(Plane(origin=(0, 0, 0), x_dir=(0, 0, -1), z_dir=(1, 0, 0)), mode=Mode.PRIVATE) as revolve2_sk:
        with Locations((-40.79375, 26.98125)):
            Rectangle(SKETCH9_W, SKETCH9_H)
    revolve(revolve2_sk.sketch.rotate(Axis((0, 0, 0), (0, 1, 0)), 180), axis=Axis((0, 0, 0), (0, 1, 0)))


solid = part.part
